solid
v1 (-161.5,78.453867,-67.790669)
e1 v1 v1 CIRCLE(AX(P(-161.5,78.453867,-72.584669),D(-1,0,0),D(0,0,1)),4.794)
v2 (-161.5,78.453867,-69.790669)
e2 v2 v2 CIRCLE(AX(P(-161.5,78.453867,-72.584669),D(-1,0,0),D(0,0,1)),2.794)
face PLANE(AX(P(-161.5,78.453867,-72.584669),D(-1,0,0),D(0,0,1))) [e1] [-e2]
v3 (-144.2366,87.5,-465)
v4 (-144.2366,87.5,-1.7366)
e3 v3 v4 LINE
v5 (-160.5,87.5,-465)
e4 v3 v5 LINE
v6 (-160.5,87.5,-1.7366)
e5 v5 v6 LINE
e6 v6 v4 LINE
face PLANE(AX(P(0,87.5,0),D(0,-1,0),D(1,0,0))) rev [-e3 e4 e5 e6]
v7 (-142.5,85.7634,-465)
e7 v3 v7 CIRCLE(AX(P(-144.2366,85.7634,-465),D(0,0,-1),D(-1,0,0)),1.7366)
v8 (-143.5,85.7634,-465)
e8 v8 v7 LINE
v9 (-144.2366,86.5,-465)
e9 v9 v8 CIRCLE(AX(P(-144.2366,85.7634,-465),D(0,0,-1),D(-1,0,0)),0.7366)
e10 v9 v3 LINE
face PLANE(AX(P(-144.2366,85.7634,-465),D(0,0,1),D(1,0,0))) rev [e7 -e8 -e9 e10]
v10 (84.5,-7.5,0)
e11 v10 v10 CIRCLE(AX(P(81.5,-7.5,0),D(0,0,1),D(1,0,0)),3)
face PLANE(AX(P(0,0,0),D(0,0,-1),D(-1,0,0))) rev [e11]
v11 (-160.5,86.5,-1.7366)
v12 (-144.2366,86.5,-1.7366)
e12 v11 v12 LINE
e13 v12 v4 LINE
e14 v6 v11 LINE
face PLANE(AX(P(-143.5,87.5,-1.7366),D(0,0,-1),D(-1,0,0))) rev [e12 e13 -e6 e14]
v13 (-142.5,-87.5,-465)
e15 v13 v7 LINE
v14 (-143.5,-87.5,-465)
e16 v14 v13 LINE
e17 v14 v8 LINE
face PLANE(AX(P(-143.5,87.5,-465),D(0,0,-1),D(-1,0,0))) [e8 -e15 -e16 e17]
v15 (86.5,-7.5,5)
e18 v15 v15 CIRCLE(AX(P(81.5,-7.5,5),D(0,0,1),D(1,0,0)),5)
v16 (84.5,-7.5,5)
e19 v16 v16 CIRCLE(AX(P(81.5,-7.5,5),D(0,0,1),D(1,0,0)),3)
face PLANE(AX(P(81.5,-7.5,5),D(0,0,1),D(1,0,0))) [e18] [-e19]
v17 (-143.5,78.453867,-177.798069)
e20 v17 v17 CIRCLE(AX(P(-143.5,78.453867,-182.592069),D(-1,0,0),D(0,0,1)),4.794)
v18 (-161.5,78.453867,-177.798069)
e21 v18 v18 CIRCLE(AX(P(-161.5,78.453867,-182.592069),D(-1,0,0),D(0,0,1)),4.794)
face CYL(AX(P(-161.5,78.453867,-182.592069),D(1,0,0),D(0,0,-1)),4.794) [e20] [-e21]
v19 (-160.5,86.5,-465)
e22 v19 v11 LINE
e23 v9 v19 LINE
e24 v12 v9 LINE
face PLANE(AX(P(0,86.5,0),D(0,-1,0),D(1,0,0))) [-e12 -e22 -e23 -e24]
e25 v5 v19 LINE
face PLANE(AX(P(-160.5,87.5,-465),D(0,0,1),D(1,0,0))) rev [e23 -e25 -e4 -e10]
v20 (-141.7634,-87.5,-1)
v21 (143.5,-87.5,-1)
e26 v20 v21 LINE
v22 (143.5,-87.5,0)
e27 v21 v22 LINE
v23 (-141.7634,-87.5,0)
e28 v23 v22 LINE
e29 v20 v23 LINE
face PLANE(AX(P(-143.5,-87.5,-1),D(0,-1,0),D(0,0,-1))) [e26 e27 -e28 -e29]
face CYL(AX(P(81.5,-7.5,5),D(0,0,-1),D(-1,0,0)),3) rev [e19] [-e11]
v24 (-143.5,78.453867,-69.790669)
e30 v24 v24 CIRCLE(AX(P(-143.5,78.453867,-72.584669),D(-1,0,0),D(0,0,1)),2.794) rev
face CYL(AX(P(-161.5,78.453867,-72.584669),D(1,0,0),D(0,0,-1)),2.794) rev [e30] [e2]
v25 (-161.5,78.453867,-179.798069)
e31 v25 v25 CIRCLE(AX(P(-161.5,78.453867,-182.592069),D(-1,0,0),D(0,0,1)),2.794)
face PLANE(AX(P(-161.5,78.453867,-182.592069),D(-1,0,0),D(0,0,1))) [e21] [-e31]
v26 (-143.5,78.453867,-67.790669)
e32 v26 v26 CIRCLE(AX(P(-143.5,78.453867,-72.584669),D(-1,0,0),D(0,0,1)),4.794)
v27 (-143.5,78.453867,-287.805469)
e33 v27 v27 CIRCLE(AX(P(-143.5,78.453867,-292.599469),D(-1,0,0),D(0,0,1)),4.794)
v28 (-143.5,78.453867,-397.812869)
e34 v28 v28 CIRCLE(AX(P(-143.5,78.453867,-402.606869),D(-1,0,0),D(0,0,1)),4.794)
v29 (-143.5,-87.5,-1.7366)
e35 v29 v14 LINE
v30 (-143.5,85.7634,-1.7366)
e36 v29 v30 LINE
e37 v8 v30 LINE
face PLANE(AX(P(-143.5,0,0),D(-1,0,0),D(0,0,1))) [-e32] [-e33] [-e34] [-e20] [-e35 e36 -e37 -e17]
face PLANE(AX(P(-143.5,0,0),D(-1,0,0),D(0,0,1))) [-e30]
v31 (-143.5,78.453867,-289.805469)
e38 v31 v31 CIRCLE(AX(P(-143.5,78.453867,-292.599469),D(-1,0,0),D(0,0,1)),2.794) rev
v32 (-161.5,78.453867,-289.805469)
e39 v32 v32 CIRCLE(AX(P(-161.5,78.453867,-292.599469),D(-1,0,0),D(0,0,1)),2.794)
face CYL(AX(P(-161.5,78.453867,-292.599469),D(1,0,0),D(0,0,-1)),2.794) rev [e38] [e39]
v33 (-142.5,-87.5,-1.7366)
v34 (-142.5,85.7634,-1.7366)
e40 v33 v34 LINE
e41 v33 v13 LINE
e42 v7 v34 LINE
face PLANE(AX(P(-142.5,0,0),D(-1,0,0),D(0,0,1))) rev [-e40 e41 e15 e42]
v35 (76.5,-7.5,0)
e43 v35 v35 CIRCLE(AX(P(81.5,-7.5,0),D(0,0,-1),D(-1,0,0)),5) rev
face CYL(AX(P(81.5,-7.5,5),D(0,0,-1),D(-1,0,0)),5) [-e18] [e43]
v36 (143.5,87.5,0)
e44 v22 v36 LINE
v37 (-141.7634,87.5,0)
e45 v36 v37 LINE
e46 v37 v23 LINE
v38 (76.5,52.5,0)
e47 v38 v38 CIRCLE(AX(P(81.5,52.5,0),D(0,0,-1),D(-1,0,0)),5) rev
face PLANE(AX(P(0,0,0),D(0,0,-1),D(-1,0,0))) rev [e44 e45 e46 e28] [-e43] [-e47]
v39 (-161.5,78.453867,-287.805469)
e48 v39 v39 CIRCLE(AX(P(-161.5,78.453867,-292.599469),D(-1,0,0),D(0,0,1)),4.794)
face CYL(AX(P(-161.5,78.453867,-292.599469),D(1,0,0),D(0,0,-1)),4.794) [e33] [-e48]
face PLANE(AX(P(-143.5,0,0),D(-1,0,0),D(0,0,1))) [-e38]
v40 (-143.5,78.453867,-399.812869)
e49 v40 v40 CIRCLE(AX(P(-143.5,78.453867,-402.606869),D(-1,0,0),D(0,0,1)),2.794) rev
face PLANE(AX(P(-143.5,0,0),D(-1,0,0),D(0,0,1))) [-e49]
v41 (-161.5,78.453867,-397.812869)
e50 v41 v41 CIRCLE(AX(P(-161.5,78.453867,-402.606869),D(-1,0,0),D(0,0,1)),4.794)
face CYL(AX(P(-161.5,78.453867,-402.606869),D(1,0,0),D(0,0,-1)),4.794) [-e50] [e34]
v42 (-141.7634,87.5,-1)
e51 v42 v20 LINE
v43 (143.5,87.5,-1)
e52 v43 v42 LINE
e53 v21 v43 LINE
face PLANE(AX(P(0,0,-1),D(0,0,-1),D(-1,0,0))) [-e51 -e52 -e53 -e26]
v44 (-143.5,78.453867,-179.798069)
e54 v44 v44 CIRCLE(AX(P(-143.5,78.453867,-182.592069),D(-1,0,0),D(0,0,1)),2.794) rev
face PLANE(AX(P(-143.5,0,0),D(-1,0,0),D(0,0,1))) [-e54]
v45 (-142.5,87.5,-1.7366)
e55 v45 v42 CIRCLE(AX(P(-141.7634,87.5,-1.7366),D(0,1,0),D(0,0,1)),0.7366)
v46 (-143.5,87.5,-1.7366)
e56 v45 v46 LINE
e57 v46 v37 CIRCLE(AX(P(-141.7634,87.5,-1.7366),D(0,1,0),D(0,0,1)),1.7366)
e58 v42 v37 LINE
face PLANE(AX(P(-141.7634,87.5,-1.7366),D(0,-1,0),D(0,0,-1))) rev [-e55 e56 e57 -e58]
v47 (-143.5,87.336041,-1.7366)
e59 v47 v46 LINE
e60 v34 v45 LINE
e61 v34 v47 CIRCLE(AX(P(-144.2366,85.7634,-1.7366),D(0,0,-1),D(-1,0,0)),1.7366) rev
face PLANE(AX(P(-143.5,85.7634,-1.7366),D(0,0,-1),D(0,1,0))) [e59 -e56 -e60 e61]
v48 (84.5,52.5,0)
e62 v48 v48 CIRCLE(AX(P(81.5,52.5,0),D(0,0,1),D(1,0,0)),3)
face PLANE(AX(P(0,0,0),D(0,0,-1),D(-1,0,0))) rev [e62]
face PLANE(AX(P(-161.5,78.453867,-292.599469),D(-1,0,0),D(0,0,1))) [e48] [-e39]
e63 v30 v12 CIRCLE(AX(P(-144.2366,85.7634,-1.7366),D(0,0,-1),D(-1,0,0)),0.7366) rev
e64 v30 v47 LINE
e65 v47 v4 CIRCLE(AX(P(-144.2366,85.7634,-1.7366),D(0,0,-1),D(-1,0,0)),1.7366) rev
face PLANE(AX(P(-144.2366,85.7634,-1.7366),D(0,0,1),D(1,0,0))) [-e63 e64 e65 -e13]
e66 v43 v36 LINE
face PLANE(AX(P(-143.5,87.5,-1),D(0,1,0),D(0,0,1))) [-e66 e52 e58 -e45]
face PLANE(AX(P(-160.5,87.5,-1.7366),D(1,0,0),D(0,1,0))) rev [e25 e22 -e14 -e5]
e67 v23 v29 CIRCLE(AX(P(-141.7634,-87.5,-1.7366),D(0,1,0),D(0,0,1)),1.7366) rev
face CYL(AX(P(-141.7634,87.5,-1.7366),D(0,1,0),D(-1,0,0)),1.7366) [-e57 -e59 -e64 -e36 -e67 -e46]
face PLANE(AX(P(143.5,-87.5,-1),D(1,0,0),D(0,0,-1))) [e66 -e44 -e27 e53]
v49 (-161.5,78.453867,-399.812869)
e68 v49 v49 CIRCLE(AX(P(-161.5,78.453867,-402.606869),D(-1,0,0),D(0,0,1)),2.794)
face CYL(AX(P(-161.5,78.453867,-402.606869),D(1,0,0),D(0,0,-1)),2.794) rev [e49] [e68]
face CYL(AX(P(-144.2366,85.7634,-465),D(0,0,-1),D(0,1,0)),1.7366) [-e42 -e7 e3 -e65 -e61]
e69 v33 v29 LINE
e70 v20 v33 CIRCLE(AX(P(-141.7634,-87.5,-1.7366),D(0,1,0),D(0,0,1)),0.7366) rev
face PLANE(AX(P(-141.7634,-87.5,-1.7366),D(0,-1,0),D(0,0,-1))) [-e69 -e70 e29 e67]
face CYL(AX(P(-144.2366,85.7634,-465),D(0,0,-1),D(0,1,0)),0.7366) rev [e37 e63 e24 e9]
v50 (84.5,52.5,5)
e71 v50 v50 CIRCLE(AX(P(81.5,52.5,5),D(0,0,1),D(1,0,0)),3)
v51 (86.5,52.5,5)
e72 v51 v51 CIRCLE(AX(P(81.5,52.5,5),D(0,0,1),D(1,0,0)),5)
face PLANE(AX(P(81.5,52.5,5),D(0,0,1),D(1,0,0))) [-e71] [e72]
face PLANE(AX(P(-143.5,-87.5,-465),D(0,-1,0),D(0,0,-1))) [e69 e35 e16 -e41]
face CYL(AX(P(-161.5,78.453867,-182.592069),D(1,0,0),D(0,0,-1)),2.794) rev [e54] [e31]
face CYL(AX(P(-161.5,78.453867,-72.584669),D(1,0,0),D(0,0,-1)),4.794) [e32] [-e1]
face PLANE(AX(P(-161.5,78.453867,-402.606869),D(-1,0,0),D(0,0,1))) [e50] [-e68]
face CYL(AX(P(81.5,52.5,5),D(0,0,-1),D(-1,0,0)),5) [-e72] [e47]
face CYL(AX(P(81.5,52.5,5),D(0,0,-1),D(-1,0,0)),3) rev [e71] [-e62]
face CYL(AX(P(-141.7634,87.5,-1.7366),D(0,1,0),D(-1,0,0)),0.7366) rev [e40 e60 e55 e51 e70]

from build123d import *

# Parameters (mm, degrees)
SKETCH1_W                    = 287
SKETCH1_H                    = 175
BASE_FLANGE1_DEPTH           = 1
EDGE_FLANGE1_STRIP_W         = 5.4732
EDGE_FLANGE1_STRIP_H         = 1
EDGE_FLANGE1_STRIP_CUT_DEPTH = 175
EDGE_FLANGE1_DEPTH           = 175
EDGE_FLANGE2_STRIP_W         = 5.4732
EDGE_FLANGE2_STRIP_H         = 1
EDGE_FLANGE2_STRIP_CUT_DEPTH = 463.2634
EDGE_FLANGE2_DEPTH           = 463.2634
SKETCH17_R                   = 4.794
SKETCH17_R_2                 = 2.794
BOSS_EXTRUDE1_DEPTH          = 18
SKETCH21_R                   = 5
SKETCH21_R_2                 = 3
BOSS_EXTRUDE2_DEPTH          = 5


# Sheet-metal steps are written as plain solids
with BuildPart() as part:
    # Sketch1 → Base-Flange1 (new body)
    with BuildSketch(Plane.XY):
        Rectangle(SKETCH1_W, SKETCH1_H)
    extrude(amount=-BASE_FLANGE1_DEPTH)

    # Edge-Flange1 strip (across the edge) → Edge-Flange1 strip cut (cut)
    with BuildSketch(Plane(origin=(-143.5, -87.5, -1), x_dir=(1, 0, 0), z_dir=(0, 1, 0))):
        with Locations((-1, -0.5)):
            Rectangle(EDGE_FLANGE1_STRIP_W, EDGE_FLANGE1_STRIP_H)
    extrude(amount=EDGE_FLANGE1_STRIP_CUT_DEPTH, mode=Mode.SUBTRACT)

    # Edge-Flange1 section (across the edge) → Edge-Flange1 (add)
    with BuildSketch(Plane(origin=(-143.5, -87.5, -1), x_dir=(1, 0, 0), z_dir=(0, 1, 0))):
        with BuildLine():
            Line((0, 0.7366), (0, 464))
            Line((0, 464), (1, 464))
            Line((1, 464), (1, 0.7366))
            ThreePointArc((1, 0.7366), (1.215745145, 0.215745145), (1.7366, 0))
            Line((1.7366, 0), (1.7366, -1))
            ThreePointArc((1.7366, -1), (0.508638364, -0.491361636), (0, 0.7366))
        make_face()
    extrude(amount=EDGE_FLANGE1_DEPTH)

    # Edge-Flange2 strip (across the edge) → Edge-Flange2 strip cut (cut)
    with BuildSketch(Plane(origin=(-143.5, 87.5, -1.7366), x_dir=(0, -1, 0), z_dir=(0, 0, -1))):
        with Locations((-1, -0.5)):
            Rectangle(EDGE_FLANGE2_STRIP_W, EDGE_FLANGE2_STRIP_H)
    extrude(amount=EDGE_FLANGE2_STRIP_CUT_DEPTH, mode=Mode.SUBTRACT)

    # Edge-Flange2 section (across the edge) → Edge-Flange2 (add)
    with BuildSketch(Plane(origin=(-143.5, 87.5, -1.7366), x_dir=(0, -1, 0), z_dir=(0, 0, -1))):
        with BuildLine():
            Line((0, 0.7366), (0, 17))
            Line((0, 17), (1, 17))
            Line((1, 17), (1, 0.7366))
            ThreePointArc((1, 0.7366), (1.215745145, 0.215745145), (1.7366, 0))
            Line((1.7366, 0), (1.7366, -1))
            ThreePointArc((1.7366, -1), (0.508638364, -0.491361636), (0, 0.7366))
        make_face()
    extrude(amount=EDGE_FLANGE2_DEPTH)

    # Sketch17 → Boss-Extrude1 (add)
    # profile 1 of 4: a face of its own
    with BuildSketch(Plane.ZY.offset(143.5)):
        with Locations((-72.584668807, 78.453866984)):
            Circle(SKETCH17_R)
        with Locations((-72.584668807, 78.453866984)):
            Circle(SKETCH17_R_2, mode=Mode.SUBTRACT)
    # profile 2 of 4: a face of its own
    with BuildSketch(Plane.ZY.offset(143.5)):
        with Locations((-182.592068807, 78.453866984)):
            Circle(SKETCH17_R)
        with Locations((-182.592068807, 78.453866984)):
            Circle(SKETCH17_R_2, mode=Mode.SUBTRACT)
    # profile 3 of 4: a face of its own
    with BuildSketch(Plane.ZY.offset(143.5)):
        with Locations((-292.599468807, 78.453866984)):
            Circle(SKETCH17_R)
        with Locations((-292.599468807, 78.453866984)):
            Circle(SKETCH17_R_2, mode=Mode.SUBTRACT)
    # profile 4 of 4: a face of its own
    with BuildSketch(Plane.ZY.offset(143.5)):
        with Locations((-402.606868807, 78.453866984)):
            Circle(SKETCH17_R)
        with Locations((-402.606868807, 78.453866984)):
            Circle(SKETCH17_R_2, mode=Mode.SUBTRACT)
    extrude(amount=BOSS_EXTRUDE1_DEPTH)

    # Sketch21 → Boss-Extrude2 (add)
    # profile 1 of 2: a face of its own
    with BuildSketch(Plane.XY):
        with Locations(Location((81.5, 52.5, 0), (0, 0, 180))):
            Circle(SKETCH21_R)
        with Locations((81.5, 52.5)):
            Circle(SKETCH21_R_2, mode=Mode.SUBTRACT)
    # profile 2 of 2: a face of its own
    with BuildSketch(Plane.XY):
        with Locations(Location((81.5, -7.5, 0), (0, 0, 180))):
            Circle(SKETCH21_R)
        with Locations((81.5, -7.5)):
            Circle(SKETCH21_R_2, mode=Mode.SUBTRACT)
    extrude(amount=BOSS_EXTRUDE2_DEPTH)


solid = part.part
